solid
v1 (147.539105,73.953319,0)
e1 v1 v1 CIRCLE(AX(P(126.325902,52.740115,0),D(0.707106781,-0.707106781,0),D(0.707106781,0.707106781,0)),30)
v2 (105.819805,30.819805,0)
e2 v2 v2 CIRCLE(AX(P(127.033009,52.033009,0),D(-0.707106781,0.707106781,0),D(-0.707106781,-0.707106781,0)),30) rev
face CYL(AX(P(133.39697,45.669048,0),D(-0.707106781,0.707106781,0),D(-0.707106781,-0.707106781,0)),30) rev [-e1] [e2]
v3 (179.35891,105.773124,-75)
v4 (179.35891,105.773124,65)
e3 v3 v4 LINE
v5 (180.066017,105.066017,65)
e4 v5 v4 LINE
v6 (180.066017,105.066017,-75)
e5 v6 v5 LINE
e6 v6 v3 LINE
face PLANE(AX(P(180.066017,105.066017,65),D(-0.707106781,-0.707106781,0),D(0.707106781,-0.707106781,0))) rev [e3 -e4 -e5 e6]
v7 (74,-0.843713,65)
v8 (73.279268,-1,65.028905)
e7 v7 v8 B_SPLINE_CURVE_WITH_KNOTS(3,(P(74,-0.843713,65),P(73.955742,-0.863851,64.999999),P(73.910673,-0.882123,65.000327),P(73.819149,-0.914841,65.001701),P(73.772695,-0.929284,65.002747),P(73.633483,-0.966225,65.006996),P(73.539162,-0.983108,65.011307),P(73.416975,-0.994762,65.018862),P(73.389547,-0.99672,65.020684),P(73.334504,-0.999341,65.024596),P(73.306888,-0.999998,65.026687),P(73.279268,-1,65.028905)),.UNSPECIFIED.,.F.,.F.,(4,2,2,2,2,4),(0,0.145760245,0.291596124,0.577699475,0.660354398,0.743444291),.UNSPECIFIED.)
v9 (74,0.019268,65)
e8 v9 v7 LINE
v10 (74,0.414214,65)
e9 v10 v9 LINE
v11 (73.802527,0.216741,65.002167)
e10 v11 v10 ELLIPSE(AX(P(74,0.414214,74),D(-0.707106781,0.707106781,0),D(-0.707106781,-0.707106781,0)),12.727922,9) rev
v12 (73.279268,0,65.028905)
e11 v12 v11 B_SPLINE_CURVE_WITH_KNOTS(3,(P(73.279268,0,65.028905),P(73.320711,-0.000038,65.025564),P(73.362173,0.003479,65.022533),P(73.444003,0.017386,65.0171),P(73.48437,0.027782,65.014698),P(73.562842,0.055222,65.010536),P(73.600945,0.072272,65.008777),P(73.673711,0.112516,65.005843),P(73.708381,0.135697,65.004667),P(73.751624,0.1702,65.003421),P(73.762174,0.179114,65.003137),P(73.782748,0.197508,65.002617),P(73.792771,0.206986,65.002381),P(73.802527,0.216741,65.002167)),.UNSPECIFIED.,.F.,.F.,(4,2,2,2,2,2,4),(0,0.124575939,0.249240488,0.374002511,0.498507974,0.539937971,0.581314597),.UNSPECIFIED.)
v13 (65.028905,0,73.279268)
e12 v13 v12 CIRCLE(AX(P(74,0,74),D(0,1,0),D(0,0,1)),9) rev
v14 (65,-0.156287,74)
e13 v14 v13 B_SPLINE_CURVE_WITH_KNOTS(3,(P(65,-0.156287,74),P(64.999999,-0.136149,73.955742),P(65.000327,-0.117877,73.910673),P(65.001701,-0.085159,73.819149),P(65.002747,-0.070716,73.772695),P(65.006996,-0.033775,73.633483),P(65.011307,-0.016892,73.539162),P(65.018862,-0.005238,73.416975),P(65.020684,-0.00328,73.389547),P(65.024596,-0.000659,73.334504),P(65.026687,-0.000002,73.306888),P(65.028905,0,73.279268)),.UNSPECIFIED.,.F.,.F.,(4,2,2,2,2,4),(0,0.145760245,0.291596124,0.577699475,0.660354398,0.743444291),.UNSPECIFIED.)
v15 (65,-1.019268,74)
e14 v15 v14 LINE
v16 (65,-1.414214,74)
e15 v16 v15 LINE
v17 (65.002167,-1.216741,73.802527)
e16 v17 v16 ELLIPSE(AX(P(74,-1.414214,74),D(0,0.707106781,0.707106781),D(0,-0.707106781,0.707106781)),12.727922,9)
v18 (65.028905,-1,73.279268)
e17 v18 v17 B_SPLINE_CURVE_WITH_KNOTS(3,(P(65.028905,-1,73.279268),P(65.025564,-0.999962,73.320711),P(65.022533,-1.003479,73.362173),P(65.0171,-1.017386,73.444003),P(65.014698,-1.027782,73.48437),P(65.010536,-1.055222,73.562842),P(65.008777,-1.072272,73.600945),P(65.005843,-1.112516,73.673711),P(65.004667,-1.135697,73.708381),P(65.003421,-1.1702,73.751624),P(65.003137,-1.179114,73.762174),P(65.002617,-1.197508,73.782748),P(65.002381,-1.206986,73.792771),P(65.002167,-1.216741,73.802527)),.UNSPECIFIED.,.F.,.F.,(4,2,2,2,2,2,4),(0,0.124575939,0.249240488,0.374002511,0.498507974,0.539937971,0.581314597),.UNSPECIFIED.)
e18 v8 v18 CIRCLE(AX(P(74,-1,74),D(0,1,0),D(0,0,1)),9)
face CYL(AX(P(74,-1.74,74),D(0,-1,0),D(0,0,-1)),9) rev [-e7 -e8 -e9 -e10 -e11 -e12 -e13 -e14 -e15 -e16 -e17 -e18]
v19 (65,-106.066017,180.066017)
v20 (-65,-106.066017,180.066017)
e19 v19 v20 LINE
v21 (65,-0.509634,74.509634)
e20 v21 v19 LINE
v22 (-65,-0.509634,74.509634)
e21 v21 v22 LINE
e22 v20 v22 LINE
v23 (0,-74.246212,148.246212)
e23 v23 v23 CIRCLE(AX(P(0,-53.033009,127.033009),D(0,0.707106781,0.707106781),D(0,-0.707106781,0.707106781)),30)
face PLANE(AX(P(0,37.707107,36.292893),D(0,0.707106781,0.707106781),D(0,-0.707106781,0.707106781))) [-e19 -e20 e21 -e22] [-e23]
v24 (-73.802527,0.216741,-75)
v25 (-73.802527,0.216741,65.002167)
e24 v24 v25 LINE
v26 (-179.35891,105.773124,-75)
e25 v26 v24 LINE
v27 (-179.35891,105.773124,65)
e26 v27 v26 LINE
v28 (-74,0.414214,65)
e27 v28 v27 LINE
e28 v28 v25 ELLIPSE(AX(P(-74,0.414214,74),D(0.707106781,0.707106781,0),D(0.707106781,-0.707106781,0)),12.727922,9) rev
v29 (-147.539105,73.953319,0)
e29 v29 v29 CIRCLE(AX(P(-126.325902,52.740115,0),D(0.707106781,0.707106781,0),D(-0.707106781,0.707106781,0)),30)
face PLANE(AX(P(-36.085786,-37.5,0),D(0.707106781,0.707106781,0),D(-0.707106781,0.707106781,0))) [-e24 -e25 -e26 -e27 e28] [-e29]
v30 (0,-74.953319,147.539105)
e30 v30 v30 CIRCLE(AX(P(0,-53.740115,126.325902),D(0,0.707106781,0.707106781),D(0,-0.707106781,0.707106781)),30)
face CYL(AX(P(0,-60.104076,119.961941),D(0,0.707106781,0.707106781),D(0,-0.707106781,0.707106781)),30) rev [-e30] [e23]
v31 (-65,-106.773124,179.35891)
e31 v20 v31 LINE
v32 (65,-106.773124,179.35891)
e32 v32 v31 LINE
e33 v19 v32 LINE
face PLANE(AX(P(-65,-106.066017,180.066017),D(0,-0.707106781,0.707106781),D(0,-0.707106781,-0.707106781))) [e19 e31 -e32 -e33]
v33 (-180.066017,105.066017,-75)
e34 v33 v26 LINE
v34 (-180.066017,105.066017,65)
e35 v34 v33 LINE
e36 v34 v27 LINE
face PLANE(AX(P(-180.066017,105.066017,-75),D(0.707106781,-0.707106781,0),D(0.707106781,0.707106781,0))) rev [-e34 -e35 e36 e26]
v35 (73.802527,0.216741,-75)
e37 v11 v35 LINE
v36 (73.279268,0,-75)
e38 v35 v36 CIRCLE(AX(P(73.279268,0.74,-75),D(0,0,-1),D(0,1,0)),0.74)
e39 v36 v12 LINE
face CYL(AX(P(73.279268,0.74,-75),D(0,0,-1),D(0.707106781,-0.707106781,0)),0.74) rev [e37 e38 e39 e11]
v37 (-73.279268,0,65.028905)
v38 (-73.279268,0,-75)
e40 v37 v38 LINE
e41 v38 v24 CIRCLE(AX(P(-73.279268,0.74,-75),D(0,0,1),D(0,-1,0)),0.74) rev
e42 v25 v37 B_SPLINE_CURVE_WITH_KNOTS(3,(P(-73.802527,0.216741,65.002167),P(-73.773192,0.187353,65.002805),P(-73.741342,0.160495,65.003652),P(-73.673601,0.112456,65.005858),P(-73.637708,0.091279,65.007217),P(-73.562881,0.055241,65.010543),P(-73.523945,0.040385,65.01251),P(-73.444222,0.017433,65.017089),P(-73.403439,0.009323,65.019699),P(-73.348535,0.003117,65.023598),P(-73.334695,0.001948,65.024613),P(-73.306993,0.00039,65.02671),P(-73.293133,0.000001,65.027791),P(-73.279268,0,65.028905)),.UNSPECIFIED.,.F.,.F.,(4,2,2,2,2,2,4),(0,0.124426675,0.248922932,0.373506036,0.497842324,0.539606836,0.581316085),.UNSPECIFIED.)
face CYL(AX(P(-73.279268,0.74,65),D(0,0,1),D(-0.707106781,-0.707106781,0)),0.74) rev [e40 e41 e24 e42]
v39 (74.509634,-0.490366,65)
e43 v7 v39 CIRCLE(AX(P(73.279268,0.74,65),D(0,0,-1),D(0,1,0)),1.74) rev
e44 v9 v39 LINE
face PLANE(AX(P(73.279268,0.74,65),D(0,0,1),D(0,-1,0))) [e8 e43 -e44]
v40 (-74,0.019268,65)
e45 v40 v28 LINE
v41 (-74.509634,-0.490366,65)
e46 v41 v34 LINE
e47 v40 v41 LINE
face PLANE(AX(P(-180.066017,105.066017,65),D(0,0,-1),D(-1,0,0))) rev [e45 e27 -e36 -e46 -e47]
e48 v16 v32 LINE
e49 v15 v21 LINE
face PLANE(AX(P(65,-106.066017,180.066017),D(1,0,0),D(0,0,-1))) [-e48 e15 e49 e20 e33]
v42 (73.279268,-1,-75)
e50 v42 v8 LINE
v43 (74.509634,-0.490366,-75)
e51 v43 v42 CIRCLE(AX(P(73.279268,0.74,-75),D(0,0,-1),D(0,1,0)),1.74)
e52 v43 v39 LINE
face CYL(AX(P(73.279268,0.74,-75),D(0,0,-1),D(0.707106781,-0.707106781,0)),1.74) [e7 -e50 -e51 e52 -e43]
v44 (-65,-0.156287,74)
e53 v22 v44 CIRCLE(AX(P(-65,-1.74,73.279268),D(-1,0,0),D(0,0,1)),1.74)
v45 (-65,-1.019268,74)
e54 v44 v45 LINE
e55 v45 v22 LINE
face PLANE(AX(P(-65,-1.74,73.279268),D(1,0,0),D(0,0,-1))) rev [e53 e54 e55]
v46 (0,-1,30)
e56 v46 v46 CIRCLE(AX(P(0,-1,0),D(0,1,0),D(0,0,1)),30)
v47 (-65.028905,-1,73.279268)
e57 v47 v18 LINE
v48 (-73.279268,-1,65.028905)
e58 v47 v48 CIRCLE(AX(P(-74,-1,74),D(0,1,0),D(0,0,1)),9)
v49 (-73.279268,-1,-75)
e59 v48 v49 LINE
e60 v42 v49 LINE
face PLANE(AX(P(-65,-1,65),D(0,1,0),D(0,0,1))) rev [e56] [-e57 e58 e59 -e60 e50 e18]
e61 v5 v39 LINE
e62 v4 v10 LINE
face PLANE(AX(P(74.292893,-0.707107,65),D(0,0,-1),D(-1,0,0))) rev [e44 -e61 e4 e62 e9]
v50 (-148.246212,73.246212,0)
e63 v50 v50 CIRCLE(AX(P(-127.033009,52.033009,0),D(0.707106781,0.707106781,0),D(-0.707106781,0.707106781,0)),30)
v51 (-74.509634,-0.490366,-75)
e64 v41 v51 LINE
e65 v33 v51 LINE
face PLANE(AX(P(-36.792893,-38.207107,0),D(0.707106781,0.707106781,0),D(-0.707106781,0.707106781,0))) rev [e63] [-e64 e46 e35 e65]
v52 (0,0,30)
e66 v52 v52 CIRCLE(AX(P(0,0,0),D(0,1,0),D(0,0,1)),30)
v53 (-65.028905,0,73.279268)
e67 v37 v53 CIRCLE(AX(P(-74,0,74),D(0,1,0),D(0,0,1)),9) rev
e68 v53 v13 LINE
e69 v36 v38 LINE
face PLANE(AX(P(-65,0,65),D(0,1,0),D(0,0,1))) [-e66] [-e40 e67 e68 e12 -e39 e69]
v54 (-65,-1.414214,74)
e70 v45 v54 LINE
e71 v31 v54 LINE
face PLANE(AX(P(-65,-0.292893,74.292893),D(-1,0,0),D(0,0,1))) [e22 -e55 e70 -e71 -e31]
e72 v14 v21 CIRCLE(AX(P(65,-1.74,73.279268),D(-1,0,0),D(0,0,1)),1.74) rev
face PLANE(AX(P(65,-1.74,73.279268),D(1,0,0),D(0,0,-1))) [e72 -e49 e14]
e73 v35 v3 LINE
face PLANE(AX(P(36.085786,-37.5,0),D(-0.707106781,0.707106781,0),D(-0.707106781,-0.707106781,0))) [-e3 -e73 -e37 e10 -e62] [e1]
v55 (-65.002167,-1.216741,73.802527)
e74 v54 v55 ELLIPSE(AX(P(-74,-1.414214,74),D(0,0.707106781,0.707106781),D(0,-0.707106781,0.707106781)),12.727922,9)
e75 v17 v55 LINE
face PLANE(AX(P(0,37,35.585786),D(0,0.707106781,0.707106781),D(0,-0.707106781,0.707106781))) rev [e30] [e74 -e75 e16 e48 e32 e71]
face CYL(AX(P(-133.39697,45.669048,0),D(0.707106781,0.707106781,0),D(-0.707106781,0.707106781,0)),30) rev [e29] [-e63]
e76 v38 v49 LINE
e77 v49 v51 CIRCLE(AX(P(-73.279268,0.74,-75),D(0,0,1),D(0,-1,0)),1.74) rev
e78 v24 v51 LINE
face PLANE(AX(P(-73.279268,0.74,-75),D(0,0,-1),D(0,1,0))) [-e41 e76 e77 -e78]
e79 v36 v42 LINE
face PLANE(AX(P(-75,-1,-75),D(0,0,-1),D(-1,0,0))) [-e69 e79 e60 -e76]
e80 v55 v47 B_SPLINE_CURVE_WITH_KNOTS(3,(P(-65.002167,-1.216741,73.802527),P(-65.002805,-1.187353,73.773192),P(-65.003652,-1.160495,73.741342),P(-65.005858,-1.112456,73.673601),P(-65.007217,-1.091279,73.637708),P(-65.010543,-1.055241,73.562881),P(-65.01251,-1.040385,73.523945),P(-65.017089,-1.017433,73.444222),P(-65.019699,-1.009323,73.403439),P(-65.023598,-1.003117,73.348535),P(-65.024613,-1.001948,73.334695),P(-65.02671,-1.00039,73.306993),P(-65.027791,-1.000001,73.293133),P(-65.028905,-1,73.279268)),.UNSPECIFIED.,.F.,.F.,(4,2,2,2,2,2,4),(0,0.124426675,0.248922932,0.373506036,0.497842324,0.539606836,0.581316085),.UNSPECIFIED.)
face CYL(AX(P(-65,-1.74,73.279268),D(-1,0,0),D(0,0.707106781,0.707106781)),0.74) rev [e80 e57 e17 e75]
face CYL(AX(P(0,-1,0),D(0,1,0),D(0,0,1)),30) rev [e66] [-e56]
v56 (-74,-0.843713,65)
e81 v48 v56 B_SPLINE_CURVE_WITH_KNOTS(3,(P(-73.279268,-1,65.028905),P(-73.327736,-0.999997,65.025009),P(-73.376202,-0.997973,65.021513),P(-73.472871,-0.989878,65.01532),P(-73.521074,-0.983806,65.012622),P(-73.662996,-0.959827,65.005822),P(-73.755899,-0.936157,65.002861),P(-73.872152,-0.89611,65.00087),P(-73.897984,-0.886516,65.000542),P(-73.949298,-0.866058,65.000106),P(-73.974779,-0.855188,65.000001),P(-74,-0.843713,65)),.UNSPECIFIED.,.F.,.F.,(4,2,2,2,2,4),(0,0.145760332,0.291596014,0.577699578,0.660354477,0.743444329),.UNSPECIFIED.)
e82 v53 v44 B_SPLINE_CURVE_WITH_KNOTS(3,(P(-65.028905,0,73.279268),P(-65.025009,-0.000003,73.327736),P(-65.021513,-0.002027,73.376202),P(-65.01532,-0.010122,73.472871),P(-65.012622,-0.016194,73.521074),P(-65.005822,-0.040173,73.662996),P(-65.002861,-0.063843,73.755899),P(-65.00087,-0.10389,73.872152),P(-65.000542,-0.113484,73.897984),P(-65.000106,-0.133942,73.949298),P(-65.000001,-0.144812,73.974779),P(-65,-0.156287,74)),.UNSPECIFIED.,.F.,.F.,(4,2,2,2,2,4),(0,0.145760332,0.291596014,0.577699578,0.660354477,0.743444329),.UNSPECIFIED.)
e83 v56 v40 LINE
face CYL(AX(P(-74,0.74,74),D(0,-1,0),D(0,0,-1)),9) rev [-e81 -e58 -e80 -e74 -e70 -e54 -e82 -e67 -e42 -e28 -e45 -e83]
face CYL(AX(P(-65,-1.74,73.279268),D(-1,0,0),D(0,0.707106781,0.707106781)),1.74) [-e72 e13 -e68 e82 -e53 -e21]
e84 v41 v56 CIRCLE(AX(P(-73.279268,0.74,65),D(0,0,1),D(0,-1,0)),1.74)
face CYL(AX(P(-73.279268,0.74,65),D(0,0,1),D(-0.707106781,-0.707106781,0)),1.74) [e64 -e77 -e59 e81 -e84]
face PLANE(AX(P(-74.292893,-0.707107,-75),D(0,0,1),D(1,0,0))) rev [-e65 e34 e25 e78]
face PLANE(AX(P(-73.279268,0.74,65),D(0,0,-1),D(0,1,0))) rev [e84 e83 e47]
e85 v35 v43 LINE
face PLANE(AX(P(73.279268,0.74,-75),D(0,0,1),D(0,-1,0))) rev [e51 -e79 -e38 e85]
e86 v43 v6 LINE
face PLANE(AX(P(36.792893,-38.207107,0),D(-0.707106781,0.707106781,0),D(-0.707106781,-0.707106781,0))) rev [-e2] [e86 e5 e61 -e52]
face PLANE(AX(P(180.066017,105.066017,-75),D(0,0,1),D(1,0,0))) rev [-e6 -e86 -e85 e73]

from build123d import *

# Parameters (mm, degrees)
SKETCH1_R            = 30
BASE_FLANGE1_DEPTH   = 1
EDGE_FLANGE1_START   = -75
EDGE_FLANGE1_DEPTH   = 140.5
EDGE_FLANGE1_START_2 = 65
EDGE_FLANGE1_2_DEPTH = 0.5
EDGE_FLANGE1_3_DEPTH = 140
SKETCH12_R           = 30
CUT_EXTRUDE1_DEPTH   = 10
EDGE_FLANGE2_START   = -65.5
EDGE_FLANGE2_DEPTH   = 131
EDGE_FLANGE2_2_DEPTH = 0.5
EDGE_FLANGE2_START_2 = 65
EDGE_FLANGE2_3_DEPTH = 0.5
EDGE_FLANGE2_START_3 = -65
EDGE_FLANGE2_4_DEPTH = 130
SKETCH16_R           = 30
CUT_EXTRUDE2_DEPTH   = 10
CUT_EXTRUDE3_DEPTH   = 10
FILLET2_R            = 9


# Read off the part's stored shape, not the designer's step: Edge-Flange1, Edge-Flange2
# Sheet-metal steps are written as plain solids
with BuildPart() as part:
    # Sketch1 → Base-Flange1 (new body)
    with BuildSketch(Plane(origin=(0, 0, 0), x_dir=(1, 0, 0), z_dir=(0, 1, 0))):
        with BuildLine():
            Line((-75, -65), (-75, 75))
            Line((-75, 75), (75, 75))
            Line((75, 75), (75, -65))
            ThreePointArc((75, -65), (72.071067812, -72.071067812), (65, -75))
            Line((65, -75), (-65, -75))
            ThreePointArc((-65, -75), (-72.071067812, -72.071067812), (-75, -65))
        make_face()
        with Locations(Location((0, 0, 0), (0, 0, 270))):
            Circle(SKETCH1_R, mode=Mode.SUBTRACT)
    extrude(amount=-BASE_FLANGE1_DEPTH)

    # Edge-Flange1 outline → Edge-Flange1 (cut)
    with BuildSketch(Plane.XY.offset(EDGE_FLANGE1_START)):
        with BuildLine():
            Line((-75, -1), (-73.279268401, -1))
            ThreePointArc((-73.279268401, -1), (-73.945137574, -0.867550387), (-74.509634201, -0.490365799))
            Line((-74.509634201, -0.490365799), (-75, 0))
            Line((-75, 0), (-75, -1))
        make_face()
        with BuildLine():
            ThreePointArc((74.509634201, -0.490365799), (73.945137574, -0.867550387), (73.279268401, -1))
            Line((73.279268401, -1), (75, -1))
            Line((75, -1), (75, 0))
            Line((75, 0), (74.509634201, -0.490365799))
        make_face()
    extrude(amount=EDGE_FLANGE1_DEPTH, mode=Mode.SUBTRACT)

    # Edge-Flange1 2 outline → Edge-Flange1 2 (cut)
    with BuildSketch(Plane.XY.offset(EDGE_FLANGE1_START_2)):
        with BuildLine():
            Line((-72.779268401, -1), (-72.779268401, 0))
            Line((-72.779268401, 0), (-75, 0))
            Line((-75, 0), (-74.509634201, -0.490365799))
            ThreePointArc((-74.509634201, -0.490365799), (-73.945137574, -0.867550387), (-73.279268401, -1))
            Line((-73.279268401, -1), (-72.779268401, -1))
        make_face()
        with BuildLine():
            Line((75, 0), (72.779268401, 0))
            Line((72.779268401, 0), (72.779268401, -1))
            Line((72.779268401, -1), (73.279268401, -1))
            ThreePointArc((73.279268401, -1), (73.945137574, -0.867550387), (74.509634201, -0.490365799))
            Line((74.509634201, -0.490365799), (75, 0))
        make_face()
    extrude(amount=EDGE_FLANGE1_2_DEPTH, mode=Mode.SUBTRACT)

    # Edge-Flange1 3 outline → Edge-Flange1 3 (add)
    with BuildSketch(Plane.XY.offset(EDGE_FLANGE1_START)):
        with BuildLine():
            Line((-75, 0), (-73.279268401, 0))
            ThreePointArc((-73.279268401, 0), (-73.562454141, 0.056329146), (-73.80252742, 0.216740982))
            Line((-73.80252742, 0.216740982), (-179.358910397, 105.773123959))
            Line((-179.358910397, 105.773123959), (-180.066017178, 105.066017178))
            Line((-180.066017178, 105.066017178), (-75, 0))
        make_face()
        with BuildLine():
            ThreePointArc((73.80252742, 0.216740982), (73.562454141, 0.056329146), (73.279268401, 0))
            Line((73.279268401, 0), (75, 0))
            Line((75, 0), (180.066017178, 105.066017178))
            Line((180.066017178, 105.066017178), (179.358910397, 105.773123959))
            Line((179.358910397, 105.773123959), (73.80252742, 0.216740982))
        make_face()
    extrude(amount=EDGE_FLANGE1_3_DEPTH)

    # Sketch12 → Cut-Extrude1 (cut)
    with BuildSketch(Plane(origin=(-36.792893219, -36.792893219, 0), x_dir=(0, 0, -1), z_dir=(0.7071067811865438, 0.7071067811865512, 0))):
        with Locations(Location((0, 126.618795027, 0), (0, 0, 90))):
            Circle(SKETCH12_R)
    cut_extrude1 = extrude(amount=-CUT_EXTRUDE1_DEPTH, mode=Mode.SUBTRACT)

    # Mirror1: Cut-Extrude1 across plane
    add(cut_extrude1.mirror(Plane(origin=(0, 0, 0), x_dir=(0, 0, 1), z_dir=(1, 0, 0))), mode=Mode.SUBTRACT)

    # Edge-Flange2 outline → Edge-Flange2 (cut)
    with BuildSketch(Plane.YZ.offset(EDGE_FLANGE2_START)):
        with BuildLine():
            ThreePointArc((-0.509634201, 74.509634201), (-0.132449613, 73.945137574), (0, 73.279268401))
            Line((0, 73.279268401), (0, 75))
            Line((0, 75), (-1, 75))
            Line((-1, 75), (-0.509634201, 74.509634201))
        make_face()
    extrude(amount=EDGE_FLANGE2_DEPTH, mode=Mode.SUBTRACT)

    # Edge-Flange2 2 outline → Edge-Flange2 2 (cut)
    with BuildSketch(Plane.YZ.offset(EDGE_FLANGE2_START)):
        with BuildLine():
            Line((-1, 72.779268401), (0, 72.779268401))
            Line((0, 72.779268401), (0, 73.279268401))
            ThreePointArc((0, 73.279268401), (-0.132449613, 73.945137574), (-0.509634201, 74.509634201))
            Line((-0.509634201, 74.509634201), (-1, 75))
            Line((-1, 75), (-1, 72.779268401))
        make_face()
    extrude(amount=EDGE_FLANGE2_2_DEPTH, mode=Mode.SUBTRACT)

    # Edge-Flange2 3 outline → Edge-Flange2 3 (cut)
    with BuildSketch(Plane.YZ.offset(EDGE_FLANGE2_START_2)):
        with BuildLine():
            Line((-1, 72.779268401), (0, 72.779268401))
            Line((0, 72.779268401), (0, 73.279268401))
            ThreePointArc((0, 73.279268401), (-0.132449613, 73.945137574), (-0.509634201, 74.509634201))
            Line((-0.509634201, 74.509634201), (-1, 75))
            Line((-1, 75), (-1, 72.779268401))
        make_face()
    extrude(amount=EDGE_FLANGE2_3_DEPTH, mode=Mode.SUBTRACT)

    # Edge-Flange2 4 outline → Edge-Flange2 4 (add)
    with BuildSketch(Plane.YZ.offset(EDGE_FLANGE2_START_3)):
        with BuildLine():
            ThreePointArc((-1.216740982, 73.80252742), (-1.056329146, 73.562454141), (-1, 73.279268401))
            Line((-1, 73.279268401), (-1, 75))
            Line((-1, 75), (-106.066017178, 180.066017178))
            Line((-106.066017178, 180.066017178), (-106.773123959, 179.358910397))
            Line((-106.773123959, 179.358910397), (-1.216740982, 73.80252742))
        make_face()
    extrude(amount=EDGE_FLANGE2_4_DEPTH)

    # Sketch16 → Cut-Extrude2 (cut)
    with BuildSketch(Plane(origin=(0, 37, 37), x_dir=(1, 0, 0), z_dir=(0, 0.7071067811865513, 0.7071067811865438))):
        with Locations(Location((0, -127.325901808, 0), (0, 0, 270))):
            Circle(SKETCH16_R)
    extrude(amount=-CUT_EXTRUDE2_DEPTH, mode=Mode.SUBTRACT)

    # Sketch17 → Cut-Extrude3 (cut)
    with BuildSketch(Plane(origin=(0, 0, 0), x_dir=(1, 0, 0), z_dir=(0, 1, 0))):
        Polygon((-72.779268401, -65), (-65, -65), (-65, -72.779268401), (-65.24665486, -73.060936269), (-65.339064279, -76.419683321), (-73.753182135, -79.834644684), (-76.575821569, -65.450165918), align=None)
    cut_extrude3 = extrude(amount=-CUT_EXTRUDE3_DEPTH, mode=Mode.SUBTRACT)

    # Mirror2: Cut-Extrude3 across plane
    add(cut_extrude3.mirror(Plane(origin=(0, 0, 0), x_dir=(0, 0, 1), z_dir=(1, 0, 0))), mode=Mode.SUBTRACT)

    # Fillet2
    fillet2_edges = [part.edges().sort_by_distance(p)[0] for p in [
        (-65, -0.5, 65),
    ]]
    fillet(fillet2_edges, radius=FILLET2_R)
    fillet2_2_edges = [part.edges().sort_by_distance(p)[0] for p in [
        (65, -0.5, 65),
    ]]
    fillet(fillet2_2_edges, radius=FILLET2_R)


solid = part.part
